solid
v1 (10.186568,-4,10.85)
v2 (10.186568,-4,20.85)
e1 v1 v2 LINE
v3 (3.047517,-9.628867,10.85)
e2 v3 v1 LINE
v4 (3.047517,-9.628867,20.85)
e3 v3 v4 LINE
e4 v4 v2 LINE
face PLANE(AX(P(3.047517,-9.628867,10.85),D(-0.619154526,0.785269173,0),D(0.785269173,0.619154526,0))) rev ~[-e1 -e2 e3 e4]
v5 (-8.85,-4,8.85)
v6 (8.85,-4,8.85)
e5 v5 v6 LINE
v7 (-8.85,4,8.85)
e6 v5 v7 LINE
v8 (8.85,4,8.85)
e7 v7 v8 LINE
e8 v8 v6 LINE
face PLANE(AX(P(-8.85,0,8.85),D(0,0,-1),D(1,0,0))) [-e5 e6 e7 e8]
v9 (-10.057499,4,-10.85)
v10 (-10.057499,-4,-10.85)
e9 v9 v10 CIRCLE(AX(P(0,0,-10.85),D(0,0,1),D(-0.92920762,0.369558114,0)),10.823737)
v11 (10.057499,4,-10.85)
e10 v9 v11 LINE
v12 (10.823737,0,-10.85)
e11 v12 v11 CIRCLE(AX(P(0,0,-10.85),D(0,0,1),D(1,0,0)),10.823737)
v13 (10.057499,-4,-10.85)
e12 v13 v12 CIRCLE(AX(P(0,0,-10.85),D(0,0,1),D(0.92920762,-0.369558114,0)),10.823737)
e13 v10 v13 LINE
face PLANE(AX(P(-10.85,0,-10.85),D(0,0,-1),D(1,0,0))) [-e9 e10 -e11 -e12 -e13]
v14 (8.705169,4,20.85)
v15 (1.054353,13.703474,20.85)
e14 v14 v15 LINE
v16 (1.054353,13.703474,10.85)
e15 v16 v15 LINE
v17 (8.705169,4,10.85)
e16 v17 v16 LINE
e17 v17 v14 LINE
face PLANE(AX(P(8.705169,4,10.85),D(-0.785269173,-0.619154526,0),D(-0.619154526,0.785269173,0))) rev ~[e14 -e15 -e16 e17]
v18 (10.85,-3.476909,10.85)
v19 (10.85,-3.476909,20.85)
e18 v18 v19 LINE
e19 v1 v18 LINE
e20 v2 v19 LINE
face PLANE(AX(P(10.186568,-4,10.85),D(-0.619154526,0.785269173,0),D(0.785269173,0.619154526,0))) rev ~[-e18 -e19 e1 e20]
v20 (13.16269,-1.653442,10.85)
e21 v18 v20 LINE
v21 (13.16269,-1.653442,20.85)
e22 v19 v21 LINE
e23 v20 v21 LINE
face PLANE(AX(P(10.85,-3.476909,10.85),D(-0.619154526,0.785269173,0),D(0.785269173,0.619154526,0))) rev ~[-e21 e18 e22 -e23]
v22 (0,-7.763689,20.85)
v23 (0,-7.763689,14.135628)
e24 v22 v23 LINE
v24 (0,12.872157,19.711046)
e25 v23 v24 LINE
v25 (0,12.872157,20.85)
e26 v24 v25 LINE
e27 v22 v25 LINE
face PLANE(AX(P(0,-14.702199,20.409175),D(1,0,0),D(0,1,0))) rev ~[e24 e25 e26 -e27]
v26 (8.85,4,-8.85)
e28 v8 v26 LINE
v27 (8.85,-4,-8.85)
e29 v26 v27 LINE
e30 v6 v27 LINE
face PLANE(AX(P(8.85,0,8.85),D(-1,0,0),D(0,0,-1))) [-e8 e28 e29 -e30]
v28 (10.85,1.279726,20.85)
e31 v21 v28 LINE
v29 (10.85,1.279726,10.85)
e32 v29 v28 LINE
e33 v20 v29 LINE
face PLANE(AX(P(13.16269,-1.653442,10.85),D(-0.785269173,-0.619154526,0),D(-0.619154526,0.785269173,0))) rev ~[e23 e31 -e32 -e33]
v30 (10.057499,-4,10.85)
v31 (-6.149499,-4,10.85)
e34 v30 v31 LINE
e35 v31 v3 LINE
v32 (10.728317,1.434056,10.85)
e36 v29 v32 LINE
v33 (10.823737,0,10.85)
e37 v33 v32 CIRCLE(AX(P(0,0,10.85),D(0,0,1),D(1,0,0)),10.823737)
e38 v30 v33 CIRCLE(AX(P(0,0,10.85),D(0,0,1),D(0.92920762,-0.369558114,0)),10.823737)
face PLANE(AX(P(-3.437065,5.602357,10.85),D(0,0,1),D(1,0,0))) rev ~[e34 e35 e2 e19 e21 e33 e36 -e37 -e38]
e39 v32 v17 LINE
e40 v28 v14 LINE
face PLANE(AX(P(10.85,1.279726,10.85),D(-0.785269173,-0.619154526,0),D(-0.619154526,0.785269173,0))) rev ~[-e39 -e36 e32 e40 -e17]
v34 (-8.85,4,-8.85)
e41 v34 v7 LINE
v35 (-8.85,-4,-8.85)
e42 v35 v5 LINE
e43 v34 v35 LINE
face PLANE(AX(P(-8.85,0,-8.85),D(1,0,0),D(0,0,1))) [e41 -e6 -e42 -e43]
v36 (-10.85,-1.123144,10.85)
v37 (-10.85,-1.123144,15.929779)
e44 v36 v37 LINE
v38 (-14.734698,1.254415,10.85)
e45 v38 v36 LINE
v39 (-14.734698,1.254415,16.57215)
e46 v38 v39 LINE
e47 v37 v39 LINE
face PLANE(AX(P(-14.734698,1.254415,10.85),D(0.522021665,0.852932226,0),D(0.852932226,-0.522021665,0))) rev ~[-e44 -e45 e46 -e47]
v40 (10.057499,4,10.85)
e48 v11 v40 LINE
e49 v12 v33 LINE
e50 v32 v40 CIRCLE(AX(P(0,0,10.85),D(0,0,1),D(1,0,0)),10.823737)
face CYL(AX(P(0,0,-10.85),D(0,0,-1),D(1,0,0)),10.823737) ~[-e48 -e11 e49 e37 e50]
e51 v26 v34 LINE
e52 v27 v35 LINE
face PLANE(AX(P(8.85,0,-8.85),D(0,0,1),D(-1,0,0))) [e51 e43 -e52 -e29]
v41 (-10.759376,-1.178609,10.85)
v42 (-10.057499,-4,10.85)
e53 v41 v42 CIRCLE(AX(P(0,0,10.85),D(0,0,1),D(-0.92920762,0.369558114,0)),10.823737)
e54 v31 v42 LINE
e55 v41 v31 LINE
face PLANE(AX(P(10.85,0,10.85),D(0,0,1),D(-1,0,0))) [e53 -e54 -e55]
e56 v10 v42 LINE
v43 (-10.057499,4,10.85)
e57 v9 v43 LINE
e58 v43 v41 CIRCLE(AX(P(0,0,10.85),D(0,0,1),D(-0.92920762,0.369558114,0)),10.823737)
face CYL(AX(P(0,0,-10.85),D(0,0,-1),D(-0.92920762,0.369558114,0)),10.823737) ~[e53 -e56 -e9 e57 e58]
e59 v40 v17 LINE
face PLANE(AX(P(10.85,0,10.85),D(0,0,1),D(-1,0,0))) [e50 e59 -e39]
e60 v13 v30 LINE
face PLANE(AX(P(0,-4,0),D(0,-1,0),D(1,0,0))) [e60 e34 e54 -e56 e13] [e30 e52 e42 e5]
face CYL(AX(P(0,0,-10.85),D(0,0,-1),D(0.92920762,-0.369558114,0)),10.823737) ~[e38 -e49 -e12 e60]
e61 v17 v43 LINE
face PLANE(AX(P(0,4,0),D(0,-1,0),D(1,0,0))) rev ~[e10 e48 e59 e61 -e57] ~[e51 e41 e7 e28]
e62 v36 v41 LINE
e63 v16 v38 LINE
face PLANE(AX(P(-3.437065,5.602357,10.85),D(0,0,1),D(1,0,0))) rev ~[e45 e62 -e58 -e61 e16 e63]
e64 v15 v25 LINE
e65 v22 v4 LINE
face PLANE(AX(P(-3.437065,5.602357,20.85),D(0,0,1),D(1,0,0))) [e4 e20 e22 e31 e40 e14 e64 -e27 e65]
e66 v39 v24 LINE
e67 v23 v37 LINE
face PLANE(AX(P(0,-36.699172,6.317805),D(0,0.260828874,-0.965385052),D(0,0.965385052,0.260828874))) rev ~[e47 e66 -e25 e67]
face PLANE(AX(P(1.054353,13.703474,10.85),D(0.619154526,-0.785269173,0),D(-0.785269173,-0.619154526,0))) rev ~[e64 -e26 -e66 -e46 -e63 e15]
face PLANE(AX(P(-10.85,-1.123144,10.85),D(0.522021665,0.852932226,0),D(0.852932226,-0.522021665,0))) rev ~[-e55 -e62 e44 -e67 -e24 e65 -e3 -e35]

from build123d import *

# Parameters (mm, degrees)
F1_DEPTH      = 4
F1_DEPTH_BACK = 4
F3_DEPTH      = 10
F5_DEPTH      = 25
F7_DEPTH      = 21.7


with BuildPart() as f1:
    # F0 (on Front) → F1 (new body, two sides)
    with BuildSketch(Plane.XZ) as f1_sk:
        Polygon((-10.85, 10.85), (-10.85, 0), (-10.85, -10.85), (0, -10.85), (10.85, -10.85), (10.85, 0), (10.85, 10.85), (0, 10.85), align=None)
        Polygon((8.85, 8.85), (8.85, 0), (8.85, -8.85), (0, -8.85), (-8.85, -8.85), (-8.85, 0), (-8.85, 8.85), (0, 8.85), align=None, mode=Mode.SUBTRACT)
    extrude(amount=F1_DEPTH)
    extrude(f1_sk.sketch, amount=-F1_DEPTH_BACK)

    # F2 (on face) → F3 (join)
    with BuildSketch(Plane.XY.offset(10.85)):
        Polygon((-14.7346977867, 1.2544146994), (-10.85, -1.1231439692), (-10.85, 4), (8.7051686149, 4), (1.0543529996, 13.7034736867), align=None)
        Polygon((-6.1494992707, -4), (10.1865680069, -4), (10.85, -3.4769094021), (10.85, 1.2797259855), (8.7051686149, 4), (-10.85, 4), (-10.85, -1.1231439692), align=None)
        Polygon((-6.1494992707, -4), (3.047517268, -9.6288667992), (10.1865680069, -4), align=None)
        Polygon((10.85, 1.2797259855), (10.85, -3.4769094021), (13.1626902148, -1.6534421593), align=None)
    extrude(amount=F3_DEPTH)

    # F4 (on Right) → F5 (cut)
    with BuildSketch(Plane.YZ):
        Polygon((-36.6991721094, 6.3178054057), (17.9703272879, 21.0884753615), (-36.6991721094, 33.6725451052), align=None)
    extrude(amount=-F5_DEPTH, mode=Mode.SUBTRACT)

    # F6 (on face) → F7 (cut)
    with BuildSketch(Plane(origin=(0, 0, -10.85), x_dir=(1, 0, 0), z_dir=(0, 0, -1))):
        with BuildLine():
            Line((13.9217844345, 4.8126999282), (9.694906495, 4.8126999282))
            ThreePointArc((9.694906495, 4.8126999282), (9.8845588749, 4.4100780486), (10.0574993187, 4))
            Line((10.0574993187, 4), (10.85, 4))
            Line((10.85, 4), (10.85, -4))
            Line((10.85, -4), (10.0574993187, -4))
            ThreePointArc((10.0574993187, -4), (9.8311449192, -4.52790041), (9.5771050518, -5.0430498086))
            Line((9.5771050518, -5.0430498086), (13.9217844345, -5.0430498086))
            Line((13.9217844345, -5.0430498086), (13.9217844345, 4.8126999282))
        make_face()
        with BuildLine():
            Line((10.85, 4), (10.0574993187, 4))
            ThreePointArc((10.0574993187, 4), (10.6304521223, 2.0363644618), (10.8237374574, 0))
            ThreePointArc((10.8237374574, 0), (10.6304521223, -2.0363644618), (10.0574993187, -4))
            Line((10.0574993187, -4), (10.85, -4))
            Line((10.85, -4), (10.85, 4))
        make_face()
        with BuildLine():
            ThreePointArc((-10.0574993187, -4), (-10.8237374574, 0), (-10.0574993187, 4))
            Line((-10.0574993187, 4), (-10.85, 4))
            Line((-10.85, 4), (-10.85, -4))
            Line((-10.85, -4), (-10.0574993187, -4))
        make_face()
    extrude(amount=-F7_DEPTH, mode=Mode.SUBTRACT)


solid = f1.part
